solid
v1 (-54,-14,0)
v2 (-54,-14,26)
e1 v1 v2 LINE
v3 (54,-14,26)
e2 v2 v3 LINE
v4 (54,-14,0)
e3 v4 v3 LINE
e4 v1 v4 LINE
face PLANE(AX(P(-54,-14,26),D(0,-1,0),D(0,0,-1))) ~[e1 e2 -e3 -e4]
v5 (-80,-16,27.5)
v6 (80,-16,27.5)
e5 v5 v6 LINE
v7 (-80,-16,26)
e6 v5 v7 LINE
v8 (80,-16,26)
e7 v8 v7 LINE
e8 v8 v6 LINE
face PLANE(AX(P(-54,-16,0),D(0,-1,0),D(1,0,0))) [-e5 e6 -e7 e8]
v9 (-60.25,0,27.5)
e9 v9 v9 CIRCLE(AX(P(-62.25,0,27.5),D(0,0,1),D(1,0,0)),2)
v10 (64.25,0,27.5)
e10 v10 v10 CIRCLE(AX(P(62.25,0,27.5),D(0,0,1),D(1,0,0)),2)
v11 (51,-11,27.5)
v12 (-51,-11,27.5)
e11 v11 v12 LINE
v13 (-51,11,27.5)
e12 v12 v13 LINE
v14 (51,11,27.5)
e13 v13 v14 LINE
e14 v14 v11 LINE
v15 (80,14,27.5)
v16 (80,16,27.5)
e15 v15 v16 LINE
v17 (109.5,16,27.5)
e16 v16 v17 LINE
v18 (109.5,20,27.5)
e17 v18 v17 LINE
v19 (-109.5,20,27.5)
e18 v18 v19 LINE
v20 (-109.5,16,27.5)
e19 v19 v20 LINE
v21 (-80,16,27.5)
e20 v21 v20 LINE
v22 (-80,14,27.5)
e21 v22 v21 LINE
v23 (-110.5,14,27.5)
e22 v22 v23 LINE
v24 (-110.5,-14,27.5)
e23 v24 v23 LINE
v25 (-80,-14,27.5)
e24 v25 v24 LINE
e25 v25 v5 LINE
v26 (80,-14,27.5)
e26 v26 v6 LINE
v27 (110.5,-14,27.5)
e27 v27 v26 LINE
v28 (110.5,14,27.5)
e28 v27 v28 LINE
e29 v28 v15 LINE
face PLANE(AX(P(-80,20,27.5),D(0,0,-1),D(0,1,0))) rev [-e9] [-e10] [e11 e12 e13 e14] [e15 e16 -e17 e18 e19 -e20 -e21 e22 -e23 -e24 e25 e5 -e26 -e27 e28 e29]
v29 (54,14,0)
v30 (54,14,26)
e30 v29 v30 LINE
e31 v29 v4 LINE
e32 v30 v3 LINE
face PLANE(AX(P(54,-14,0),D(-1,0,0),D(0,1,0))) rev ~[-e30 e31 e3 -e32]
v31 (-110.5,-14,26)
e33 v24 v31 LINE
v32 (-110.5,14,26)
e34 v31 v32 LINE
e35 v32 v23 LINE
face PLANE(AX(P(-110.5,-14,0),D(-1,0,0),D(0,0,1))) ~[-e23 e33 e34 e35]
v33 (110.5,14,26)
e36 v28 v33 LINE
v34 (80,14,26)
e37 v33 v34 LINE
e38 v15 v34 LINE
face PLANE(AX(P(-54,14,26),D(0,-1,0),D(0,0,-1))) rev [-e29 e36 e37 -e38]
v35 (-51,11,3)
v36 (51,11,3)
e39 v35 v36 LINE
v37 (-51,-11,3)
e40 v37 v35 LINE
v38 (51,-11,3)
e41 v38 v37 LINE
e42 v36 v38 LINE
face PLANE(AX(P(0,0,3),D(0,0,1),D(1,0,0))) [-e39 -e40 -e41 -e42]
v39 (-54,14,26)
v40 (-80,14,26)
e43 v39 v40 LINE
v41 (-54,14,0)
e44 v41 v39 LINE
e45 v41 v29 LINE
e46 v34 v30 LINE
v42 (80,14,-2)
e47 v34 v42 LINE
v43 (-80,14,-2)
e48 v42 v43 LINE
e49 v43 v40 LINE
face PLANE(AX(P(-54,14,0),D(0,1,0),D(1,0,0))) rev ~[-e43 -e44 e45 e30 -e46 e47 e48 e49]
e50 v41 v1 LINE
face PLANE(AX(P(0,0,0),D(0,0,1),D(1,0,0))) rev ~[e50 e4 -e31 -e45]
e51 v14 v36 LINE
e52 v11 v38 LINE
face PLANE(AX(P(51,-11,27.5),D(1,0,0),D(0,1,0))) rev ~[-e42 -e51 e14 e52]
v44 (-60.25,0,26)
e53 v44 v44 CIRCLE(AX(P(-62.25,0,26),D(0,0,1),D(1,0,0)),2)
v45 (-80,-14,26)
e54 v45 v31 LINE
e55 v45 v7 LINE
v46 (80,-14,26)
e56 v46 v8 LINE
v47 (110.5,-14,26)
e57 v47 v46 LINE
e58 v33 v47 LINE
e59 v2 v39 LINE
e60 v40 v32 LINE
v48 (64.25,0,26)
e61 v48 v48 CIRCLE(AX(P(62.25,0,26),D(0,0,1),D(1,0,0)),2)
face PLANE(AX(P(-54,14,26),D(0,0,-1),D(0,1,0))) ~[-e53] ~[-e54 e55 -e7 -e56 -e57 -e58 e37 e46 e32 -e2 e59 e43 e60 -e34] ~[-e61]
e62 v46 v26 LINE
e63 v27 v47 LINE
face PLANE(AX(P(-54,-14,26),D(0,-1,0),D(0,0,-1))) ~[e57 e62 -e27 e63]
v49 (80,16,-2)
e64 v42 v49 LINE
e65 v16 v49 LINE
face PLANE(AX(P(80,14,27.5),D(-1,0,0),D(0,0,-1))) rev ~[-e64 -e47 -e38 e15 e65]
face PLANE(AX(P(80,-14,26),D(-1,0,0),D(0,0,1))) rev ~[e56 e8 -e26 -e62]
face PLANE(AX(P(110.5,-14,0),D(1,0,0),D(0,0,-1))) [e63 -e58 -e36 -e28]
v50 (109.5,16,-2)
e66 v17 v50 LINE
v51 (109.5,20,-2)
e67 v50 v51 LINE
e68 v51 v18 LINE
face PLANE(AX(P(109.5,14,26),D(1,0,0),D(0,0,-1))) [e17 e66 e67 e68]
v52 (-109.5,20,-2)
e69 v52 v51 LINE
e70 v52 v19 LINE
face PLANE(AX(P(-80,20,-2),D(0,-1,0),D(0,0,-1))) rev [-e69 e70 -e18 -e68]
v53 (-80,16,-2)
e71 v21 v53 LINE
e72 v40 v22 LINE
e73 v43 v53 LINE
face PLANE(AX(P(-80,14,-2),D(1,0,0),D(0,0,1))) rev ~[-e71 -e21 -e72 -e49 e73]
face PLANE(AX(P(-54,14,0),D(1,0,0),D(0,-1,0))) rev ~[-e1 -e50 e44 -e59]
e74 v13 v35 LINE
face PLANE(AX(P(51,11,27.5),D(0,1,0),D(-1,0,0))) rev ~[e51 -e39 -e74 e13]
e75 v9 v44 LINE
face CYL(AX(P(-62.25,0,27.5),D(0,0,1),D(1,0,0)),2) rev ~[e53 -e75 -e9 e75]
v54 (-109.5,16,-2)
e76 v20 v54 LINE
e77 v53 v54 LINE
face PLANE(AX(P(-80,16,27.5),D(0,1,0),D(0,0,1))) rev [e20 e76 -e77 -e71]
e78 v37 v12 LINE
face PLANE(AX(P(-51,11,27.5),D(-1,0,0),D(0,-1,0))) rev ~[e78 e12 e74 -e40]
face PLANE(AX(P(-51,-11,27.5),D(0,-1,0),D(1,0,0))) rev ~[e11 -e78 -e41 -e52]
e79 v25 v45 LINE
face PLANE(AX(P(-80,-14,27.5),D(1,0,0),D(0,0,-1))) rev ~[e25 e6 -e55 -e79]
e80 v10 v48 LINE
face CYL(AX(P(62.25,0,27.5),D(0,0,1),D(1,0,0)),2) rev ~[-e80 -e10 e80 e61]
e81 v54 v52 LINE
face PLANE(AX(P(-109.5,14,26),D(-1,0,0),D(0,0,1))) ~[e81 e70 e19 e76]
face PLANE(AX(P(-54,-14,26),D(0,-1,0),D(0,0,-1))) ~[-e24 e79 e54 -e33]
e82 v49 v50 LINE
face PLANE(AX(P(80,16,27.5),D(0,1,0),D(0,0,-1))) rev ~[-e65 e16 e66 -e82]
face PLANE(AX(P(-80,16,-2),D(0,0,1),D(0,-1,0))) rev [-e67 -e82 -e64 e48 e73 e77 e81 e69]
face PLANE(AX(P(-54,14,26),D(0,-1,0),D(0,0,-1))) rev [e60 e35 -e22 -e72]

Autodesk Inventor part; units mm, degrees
ref_plane "YZ Plane" through (0, 0, 0) normal (1, 0, 0) x (0, 1, 0)
ref_plane "XZ Plane" through (0, 0, 0) normal (0, 1, 0) x (-1, 0, 0)
ref_plane "XY Plane" through (0, 0, 0) normal (0, 0, 1) x (1, 0, 0)
sketch "Эскиз1" plane through (0, 0, 0) normal (0, 0, 1) x (1, 0, 0)
  line L0 (-54, -14) -> (54, -14)
  line L1 (54, -14) -> (54, 14)
  line L2 (54, 14) -> (-54, 14)
  line L3 (-54, 14) -> (-54, -14)
  line L4 (-54, -14) -> (54, 14) construction
  line L5 (54, -14) -> (-54, 14) construction
  point P0 (0, 0)
  dimension "d0" = 108
  dimension "d1" = 28
extrude "Выдавливание1" add sketch "Эскиз1" along normal blind 27.5
sketch "Эскиз2" plane through (0, 0, 27.5) normal (0, 0, 1) x (1, 0, 0)
  line L0 (-51, -11) -> (51, -11)
  line L1 (51, -11) -> (51, 11)
  line L2 (51, 11) -> (-51, 11)
  line L3 (-51, 11) -> (-51, -11)
  line L4 (-51, -11) -> (51, 11) construction
  line L5 (51, -11) -> (-51, 11) construction
  line L6 (54, 14) -> (-54, 14) projected
  line L7 (54, -14) -> (54, 14) projected
  point P0 (0, 0)
  dimension "d4" = 3
  dimension "d5" = 3
extrude "Выдавливание2" cut sketch "Эскиз2" against normal blind 24.5
sketch "Эскиз3" plane through (54, -14, 0) normal (1, 0, 0) x (0, 0, -1)
  line L0 (0, 28) -> (-27.5, 28) projected
  line L1 (0, 0) -> (-27.5, 0) projected
  line L2 (-27.5, 28) -> (-26, 28)
  line L3 (-26, 28) -> (-26, 0)
  line L4 (-26, 0) -> (-27.5, 0)
  line L5 (-27.5, 0) -> (-27.5, 28)
  point P0 (0, 14)
  dimension "d8" = 1.5
extrude "Выдавливание3" add sketch "Эскиз3" along normal blind 50
mirror "Зеркальное отражение1" about plane through (0, 0, 0) normal (1, 0, 0) of "Выдавливание3"
move faces "Перенос1" translate (6.5, 0, 0) faces at (104, 4.6667, 27)
move faces "Перенос2" translate (-6.5, 0, 0) faces at (-104, 4.6667, 27)
sketch "Эскиз7" plane through (-54, -14, 0) normal (0, -1, 0) x (1, 0, 0)
  line L0 (-56.5, 27.5) -> (164.5, 27.5) projected
  line L1 (0, 26) -> (-56.5, 26) projected
  line L2 (134, 27.5) -> (-26, 27.5)
  line L3 (-26, 27.5) -> (-26, 26)
  line L4 (-26, 26) -> (134, 26)
  line L5 (134, 26) -> (134, 27.5)
  line L6 (0, 0) -> (108, 0) projected
  point P0 (54, 0)
  point P1 (-26, 26.75)
  point P2 (54, 0)
  dimension "d29" = 160
  dimension "d30" = 80
extrude "Выдавливание7" add sketch "Эскиз7" along normal blind 2
sketch "Эскиз8" plane through (-54, 14, 0) normal (0, 1, 0) x (1, 0, 0)
  line L0 (-56.5, -27.5) -> (164.5, -27.5) projected
  line L1 (-26, -27.5) -> (134, -27.5)
  line L2 (134, -27.5) -> (134, 2)
  line L3 (134, 2) -> (-26, 2)
  line L4 (-26, 2) -> (-26, -27.5)
  line L5 (108, 0) -> (0, 0) projected
  point P0 (54, 0)
  point P1 (54, 0)
  dimension "d33" = 160
  dimension "d34" = 80
  dimension "d35" = 29.5
extrude "Выдавливание8" add sketch "Эскиз8" along normal blind 6
sketch "Эскиз9" plane through (80, 14, 26) normal (1, 0, 0) x (0, 0, -1)
  line L0 (28, 0) -> (28, 6) projected
  line L1 (28, 6) -> (-1.5, 6)
  line L2 (-1.5, 6) -> (-1.5, 2)
  line L3 (-1.5, 2) -> (28, 2)
  line L4 (28, 2) -> (28, 6)
  point P0 (26, -14)
  dimension "d38" = 4
extrude "Выдавливание9" add sketch "Эскиз9" along normal blind 29.5
mirror "Зеркальное отражение3" about plane through (0, 0, 0) normal (1, 0, 0) of "Выдавливание9"
sketch "Эскиз10" plane through (0, 0, 27.5) normal (0, 0, 1) x (1, 0, 0)
  circle A0 centre (-62.25, 0) radius 2 projected
  circle A1 centre (62.25, 0) radius 2 projected
  point P0 (0, 0)
extrude "Выдавливание10" cut sketch "Эскиз10" against normal through all
equation "\"d30\" = 0.5 * d29"
equation "\"d34\" = 0.5 * d33"
properties part number "000.009 - Короб" material "Пластик АБС"
